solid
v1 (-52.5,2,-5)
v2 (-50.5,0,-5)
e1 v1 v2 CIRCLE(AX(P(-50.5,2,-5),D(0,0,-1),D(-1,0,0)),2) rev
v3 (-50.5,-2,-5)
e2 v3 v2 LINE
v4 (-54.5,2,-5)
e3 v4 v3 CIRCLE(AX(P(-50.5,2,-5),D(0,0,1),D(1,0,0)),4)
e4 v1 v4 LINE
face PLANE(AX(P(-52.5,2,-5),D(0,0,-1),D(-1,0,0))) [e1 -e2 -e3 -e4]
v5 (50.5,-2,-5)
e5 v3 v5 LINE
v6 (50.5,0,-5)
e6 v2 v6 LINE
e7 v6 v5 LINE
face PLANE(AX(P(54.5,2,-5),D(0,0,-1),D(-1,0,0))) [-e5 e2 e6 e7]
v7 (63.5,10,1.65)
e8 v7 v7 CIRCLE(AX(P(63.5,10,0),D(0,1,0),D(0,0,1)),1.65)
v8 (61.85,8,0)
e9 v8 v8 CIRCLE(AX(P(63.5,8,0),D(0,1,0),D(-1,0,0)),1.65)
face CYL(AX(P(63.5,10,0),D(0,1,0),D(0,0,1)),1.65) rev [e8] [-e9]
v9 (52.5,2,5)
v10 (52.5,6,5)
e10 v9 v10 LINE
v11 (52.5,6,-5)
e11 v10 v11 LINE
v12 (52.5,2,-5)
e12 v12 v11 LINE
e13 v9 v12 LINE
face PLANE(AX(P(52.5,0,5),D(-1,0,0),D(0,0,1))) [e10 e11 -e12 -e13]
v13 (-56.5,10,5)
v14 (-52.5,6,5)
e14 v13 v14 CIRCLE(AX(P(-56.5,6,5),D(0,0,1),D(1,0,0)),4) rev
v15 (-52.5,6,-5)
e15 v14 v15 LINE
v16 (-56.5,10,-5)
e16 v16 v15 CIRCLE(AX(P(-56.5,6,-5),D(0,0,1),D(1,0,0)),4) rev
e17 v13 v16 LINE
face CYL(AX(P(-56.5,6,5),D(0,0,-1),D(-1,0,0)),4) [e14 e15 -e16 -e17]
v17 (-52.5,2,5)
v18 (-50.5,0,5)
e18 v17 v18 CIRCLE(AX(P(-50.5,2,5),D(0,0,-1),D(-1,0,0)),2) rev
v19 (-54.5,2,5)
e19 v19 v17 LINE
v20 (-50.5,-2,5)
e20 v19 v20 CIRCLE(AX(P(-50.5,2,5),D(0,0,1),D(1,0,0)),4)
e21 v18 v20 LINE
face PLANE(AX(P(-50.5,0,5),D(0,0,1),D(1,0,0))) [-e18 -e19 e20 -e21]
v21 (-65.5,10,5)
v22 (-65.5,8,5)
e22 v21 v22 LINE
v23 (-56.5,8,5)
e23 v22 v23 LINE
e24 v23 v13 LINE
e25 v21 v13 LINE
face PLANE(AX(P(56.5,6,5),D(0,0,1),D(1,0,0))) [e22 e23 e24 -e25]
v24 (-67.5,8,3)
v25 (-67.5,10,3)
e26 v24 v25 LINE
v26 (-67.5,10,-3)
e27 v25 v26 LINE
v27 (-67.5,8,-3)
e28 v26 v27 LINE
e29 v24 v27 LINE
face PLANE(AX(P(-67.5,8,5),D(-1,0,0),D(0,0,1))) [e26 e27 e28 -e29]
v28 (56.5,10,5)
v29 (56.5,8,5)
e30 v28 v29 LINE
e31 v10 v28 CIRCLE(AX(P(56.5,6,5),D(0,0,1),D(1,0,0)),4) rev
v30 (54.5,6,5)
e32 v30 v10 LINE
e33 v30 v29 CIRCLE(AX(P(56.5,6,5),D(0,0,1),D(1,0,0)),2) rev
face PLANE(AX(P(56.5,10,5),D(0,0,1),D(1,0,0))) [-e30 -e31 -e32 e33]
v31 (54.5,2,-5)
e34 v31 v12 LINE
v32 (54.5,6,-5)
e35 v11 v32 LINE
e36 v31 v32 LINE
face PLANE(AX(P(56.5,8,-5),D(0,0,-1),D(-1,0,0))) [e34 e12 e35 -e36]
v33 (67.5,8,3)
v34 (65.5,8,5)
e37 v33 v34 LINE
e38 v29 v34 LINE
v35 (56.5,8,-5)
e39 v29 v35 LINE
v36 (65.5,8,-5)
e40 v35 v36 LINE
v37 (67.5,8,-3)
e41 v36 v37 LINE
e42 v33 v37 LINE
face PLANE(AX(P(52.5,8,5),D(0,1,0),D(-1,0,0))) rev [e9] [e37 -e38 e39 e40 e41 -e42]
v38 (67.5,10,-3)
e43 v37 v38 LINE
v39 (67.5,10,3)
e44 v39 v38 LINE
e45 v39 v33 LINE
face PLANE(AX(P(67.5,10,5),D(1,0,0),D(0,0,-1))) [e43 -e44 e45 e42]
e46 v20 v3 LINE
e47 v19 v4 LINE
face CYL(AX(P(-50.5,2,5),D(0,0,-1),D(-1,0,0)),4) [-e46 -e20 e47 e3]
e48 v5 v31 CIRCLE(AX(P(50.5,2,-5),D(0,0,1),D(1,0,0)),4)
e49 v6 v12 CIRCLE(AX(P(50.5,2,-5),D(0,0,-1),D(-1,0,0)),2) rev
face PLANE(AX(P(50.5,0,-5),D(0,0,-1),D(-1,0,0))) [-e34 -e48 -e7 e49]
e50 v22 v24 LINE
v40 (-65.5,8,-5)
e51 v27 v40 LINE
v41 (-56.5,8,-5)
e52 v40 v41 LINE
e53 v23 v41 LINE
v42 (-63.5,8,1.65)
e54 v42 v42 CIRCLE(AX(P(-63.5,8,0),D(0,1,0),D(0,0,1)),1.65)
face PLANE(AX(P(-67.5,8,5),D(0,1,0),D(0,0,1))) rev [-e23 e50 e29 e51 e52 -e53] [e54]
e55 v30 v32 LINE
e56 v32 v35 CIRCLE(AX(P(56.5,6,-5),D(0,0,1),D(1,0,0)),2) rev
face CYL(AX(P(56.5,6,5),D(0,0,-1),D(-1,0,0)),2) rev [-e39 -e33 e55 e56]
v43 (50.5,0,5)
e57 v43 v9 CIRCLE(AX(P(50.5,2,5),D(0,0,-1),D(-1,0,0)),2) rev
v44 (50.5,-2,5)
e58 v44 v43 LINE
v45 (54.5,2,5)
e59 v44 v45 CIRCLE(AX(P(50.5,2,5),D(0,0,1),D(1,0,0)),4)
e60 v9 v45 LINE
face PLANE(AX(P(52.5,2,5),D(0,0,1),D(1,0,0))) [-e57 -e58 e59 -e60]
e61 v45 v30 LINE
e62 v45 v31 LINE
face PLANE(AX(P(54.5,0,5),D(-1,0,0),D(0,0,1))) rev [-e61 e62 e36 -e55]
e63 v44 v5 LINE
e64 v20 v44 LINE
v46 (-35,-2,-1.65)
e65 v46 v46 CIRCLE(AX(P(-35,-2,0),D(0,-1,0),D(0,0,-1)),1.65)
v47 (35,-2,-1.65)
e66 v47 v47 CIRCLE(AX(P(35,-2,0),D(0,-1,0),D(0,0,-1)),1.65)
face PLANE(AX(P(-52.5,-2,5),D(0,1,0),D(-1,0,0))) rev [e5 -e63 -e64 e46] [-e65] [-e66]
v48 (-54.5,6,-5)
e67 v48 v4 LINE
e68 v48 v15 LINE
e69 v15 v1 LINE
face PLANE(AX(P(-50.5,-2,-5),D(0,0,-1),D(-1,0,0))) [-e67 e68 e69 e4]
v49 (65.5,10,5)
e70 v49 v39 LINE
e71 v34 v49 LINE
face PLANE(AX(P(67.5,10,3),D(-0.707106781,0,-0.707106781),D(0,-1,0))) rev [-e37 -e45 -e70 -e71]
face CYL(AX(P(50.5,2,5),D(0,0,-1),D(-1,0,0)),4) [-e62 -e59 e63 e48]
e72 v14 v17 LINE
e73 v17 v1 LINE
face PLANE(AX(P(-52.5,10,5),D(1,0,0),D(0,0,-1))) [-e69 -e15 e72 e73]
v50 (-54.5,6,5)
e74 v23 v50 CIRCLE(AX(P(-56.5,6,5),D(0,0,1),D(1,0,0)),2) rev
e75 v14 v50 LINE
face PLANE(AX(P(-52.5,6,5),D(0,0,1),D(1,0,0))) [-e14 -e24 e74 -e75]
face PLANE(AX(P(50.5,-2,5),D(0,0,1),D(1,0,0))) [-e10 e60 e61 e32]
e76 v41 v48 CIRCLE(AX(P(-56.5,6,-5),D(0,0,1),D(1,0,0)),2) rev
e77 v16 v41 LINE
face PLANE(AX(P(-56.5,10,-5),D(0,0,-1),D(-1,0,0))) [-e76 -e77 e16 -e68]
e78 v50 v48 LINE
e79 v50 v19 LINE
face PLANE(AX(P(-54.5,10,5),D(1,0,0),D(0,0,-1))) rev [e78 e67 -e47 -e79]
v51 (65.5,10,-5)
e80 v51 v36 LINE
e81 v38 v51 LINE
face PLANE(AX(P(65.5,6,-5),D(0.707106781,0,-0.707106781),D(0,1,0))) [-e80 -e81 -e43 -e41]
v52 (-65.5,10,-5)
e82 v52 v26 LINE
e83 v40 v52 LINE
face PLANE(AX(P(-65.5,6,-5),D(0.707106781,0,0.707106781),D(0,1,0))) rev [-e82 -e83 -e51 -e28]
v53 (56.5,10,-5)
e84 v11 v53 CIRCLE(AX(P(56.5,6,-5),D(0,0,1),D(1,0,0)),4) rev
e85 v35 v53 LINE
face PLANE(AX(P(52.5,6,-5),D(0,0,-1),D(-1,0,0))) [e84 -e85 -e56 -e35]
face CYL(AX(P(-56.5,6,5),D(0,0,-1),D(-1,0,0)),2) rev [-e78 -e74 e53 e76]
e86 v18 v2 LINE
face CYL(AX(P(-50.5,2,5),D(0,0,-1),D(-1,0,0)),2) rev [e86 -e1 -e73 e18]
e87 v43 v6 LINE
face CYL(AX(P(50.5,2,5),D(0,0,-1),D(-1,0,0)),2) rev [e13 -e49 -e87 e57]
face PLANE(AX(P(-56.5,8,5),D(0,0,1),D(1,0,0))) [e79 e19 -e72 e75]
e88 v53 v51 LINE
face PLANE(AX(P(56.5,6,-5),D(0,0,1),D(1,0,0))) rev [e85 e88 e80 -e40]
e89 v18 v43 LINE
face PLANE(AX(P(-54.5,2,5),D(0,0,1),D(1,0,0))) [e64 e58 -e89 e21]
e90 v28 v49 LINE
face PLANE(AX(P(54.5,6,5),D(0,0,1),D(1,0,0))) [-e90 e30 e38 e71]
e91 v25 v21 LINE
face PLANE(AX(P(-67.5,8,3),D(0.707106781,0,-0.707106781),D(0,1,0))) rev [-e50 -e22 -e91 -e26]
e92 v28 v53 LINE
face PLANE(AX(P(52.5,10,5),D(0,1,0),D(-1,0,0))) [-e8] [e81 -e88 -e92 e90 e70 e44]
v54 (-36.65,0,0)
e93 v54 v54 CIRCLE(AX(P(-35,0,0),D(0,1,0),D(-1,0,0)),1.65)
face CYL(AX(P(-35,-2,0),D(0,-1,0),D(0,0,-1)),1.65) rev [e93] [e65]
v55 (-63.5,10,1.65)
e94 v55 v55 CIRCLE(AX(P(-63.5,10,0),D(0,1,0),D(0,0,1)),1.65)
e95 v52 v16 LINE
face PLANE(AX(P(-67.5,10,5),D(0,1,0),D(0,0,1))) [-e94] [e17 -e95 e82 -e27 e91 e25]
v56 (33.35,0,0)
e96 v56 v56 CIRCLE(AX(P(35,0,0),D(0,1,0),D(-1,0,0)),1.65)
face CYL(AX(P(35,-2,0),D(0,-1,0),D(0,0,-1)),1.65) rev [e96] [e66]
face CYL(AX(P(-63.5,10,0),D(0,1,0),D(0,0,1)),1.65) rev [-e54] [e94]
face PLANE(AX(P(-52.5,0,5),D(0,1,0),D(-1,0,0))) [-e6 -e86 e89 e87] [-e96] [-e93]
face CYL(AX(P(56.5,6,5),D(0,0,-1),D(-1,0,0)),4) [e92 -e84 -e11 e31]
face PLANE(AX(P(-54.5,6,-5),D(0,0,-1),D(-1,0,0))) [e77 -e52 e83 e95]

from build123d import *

# Parameters (mm, degrees)
FLANGE_BASE1_DEPTH        = 5
FURO_ROSCADO_DE_M41_D     = 3.3
FURO_ROSCADO_DE_M42_D     = 3.3
QUEBRA_CANTO1_START       = -51.265241636
QUEBRA_CANTO1_OUTLINE_W   = 99.702056148
QUEBRA_CANTO1_OUTLINE_H   = 4
QUEBRA_CANTO1_DEPTH       = 1.414213562
QUEBRA_CANTO1_START_2     = 49.851028074
QUEBRA_CANTO1_2_OUTLINE_W = 99.702056148
QUEBRA_CANTO1_2_OUTLINE_H = 4
QUEBRA_CANTO1_2_DEPTH     = 1.414213562
QUEBRA_CANTO1_START_3     = -45.608387387
QUEBRA_CANTO1_3_OUTLINE_W = 2.148971926
QUEBRA_CANTO1_3_OUTLINE_H = 4
QUEBRA_CANTO1_3_DEPTH     = 91.216774774


# Read off the part's stored shape, not the designer's step: Quebra-Canto1
# Sheet-metal steps are written as plain solids
with BuildPart() as part:
    # Esboço1 → Flange-base1 (new, symmetric)
    with BuildSketch(Plane.XY):
        with BuildLine():
            Line((-67.5, 10), (-56.5, 10))
            ThreePointArc((-56.5, 10), (-53.671572875, 8.828427125), (-52.5, 6))
            Line((-52.5, 6), (-52.5, 2))
            ThreePointArc((-52.5, 2), (-51.914213562, 0.585786438), (-50.5, 0))
            Line((-50.5, 0), (50.5, 0))
            ThreePointArc((50.5, 0), (51.914213562, 0.585786438), (52.5, 2))
            Line((52.5, 2), (52.5, 6))
            ThreePointArc((52.5, 6), (53.671572875, 8.828427125), (56.5, 10))
            Line((56.5, 10), (67.5, 10))
            Line((67.5, 10), (67.5, 8))
            Line((67.5, 8), (56.5, 8))
            ThreePointArc((56.5, 8), (55.085786438, 7.414213562), (54.5, 6))
            Line((54.5, 6), (54.5, 2))
            ThreePointArc((54.5, 2), (53.328427125, -0.828427125), (50.5, -2))
            Line((50.5, -2), (-50.5, -2))
            ThreePointArc((-50.5, -2), (-53.328427125, -0.828427125), (-54.5, 2))
            Line((-54.5, 2), (-54.5, 6))
            ThreePointArc((-54.5, 6), (-55.085786438, 7.414213562), (-56.5, 8))
            Line((-56.5, 8), (-67.5, 8))
            Line((-67.5, 8), (-67.5, 10))
        make_face()
    extrude(amount=FLANGE_BASE1_DEPTH, both=True)

    # Furo roscado de M41 (through all)
    with Locations(Plane(origin=(0, -2, 0), x_dir=(-1, 0, 0), z_dir=(0, -1, 0))):
        with Locations((35, 0), (-35, 0)):
            Hole(FURO_ROSCADO_DE_M41_D / 2)

    # Furo roscado de M42 (through all)
    with Locations(Plane(origin=(0, 10, 0), x_dir=(1, 0, 0), z_dir=(0, 1, 0))):
        with Locations((-63.5, 0), (63.5, 0)):
            Hole(FURO_ROSCADO_DE_M42_D / 2)

    # Quebra-Canto1 outline → Quebra-Canto1 (cut)
    with BuildSketch(Plane(origin=(0, 0, 0), x_dir=(0.707106781186548, 0, 0.707106781186547), z_dir=(0.707106781186547, 0, -0.707106781186548)).offset(QUEBRA_CANTO1_START)):
        with Locations((0, -9)):
            Rectangle(QUEBRA_CANTO1_OUTLINE_W, QUEBRA_CANTO1_OUTLINE_H)
    extrude(amount=QUEBRA_CANTO1_DEPTH, mode=Mode.SUBTRACT)

    # Quebra-Canto1 2 outline → Quebra-Canto1 2 (cut)
    with BuildSketch(Plane(origin=(0, 0, 0), x_dir=(0.707106781186548, 0, 0.707106781186547), z_dir=(0.707106781186547, 0, -0.707106781186548)).offset(QUEBRA_CANTO1_START_2)):
        with Locations((0, -9)):
            Rectangle(QUEBRA_CANTO1_2_OUTLINE_W, QUEBRA_CANTO1_2_OUTLINE_H)
    extrude(amount=QUEBRA_CANTO1_2_DEPTH, mode=Mode.SUBTRACT)

    # Quebra-Canto1 3 outline → Quebra-Canto1 3 (cut)
    with BuildSketch(Plane(origin=(0, 0, 0), x_dir=(0.707106781186548, 0, 0.707106781186547), z_dir=(0.707106781186547, 0, -0.707106781186548)).offset(QUEBRA_CANTO1_START_3)):
        with Locations((-50.925514037, -9)):
            Rectangle(QUEBRA_CANTO1_3_OUTLINE_W, QUEBRA_CANTO1_3_OUTLINE_H)
        with Locations((50.925514037, -9)):
            Rectangle(QUEBRA_CANTO1_3_OUTLINE_W, QUEBRA_CANTO1_3_OUTLINE_H)
    extrude(amount=QUEBRA_CANTO1_3_DEPTH, mode=Mode.SUBTRACT)


solid = part.part
